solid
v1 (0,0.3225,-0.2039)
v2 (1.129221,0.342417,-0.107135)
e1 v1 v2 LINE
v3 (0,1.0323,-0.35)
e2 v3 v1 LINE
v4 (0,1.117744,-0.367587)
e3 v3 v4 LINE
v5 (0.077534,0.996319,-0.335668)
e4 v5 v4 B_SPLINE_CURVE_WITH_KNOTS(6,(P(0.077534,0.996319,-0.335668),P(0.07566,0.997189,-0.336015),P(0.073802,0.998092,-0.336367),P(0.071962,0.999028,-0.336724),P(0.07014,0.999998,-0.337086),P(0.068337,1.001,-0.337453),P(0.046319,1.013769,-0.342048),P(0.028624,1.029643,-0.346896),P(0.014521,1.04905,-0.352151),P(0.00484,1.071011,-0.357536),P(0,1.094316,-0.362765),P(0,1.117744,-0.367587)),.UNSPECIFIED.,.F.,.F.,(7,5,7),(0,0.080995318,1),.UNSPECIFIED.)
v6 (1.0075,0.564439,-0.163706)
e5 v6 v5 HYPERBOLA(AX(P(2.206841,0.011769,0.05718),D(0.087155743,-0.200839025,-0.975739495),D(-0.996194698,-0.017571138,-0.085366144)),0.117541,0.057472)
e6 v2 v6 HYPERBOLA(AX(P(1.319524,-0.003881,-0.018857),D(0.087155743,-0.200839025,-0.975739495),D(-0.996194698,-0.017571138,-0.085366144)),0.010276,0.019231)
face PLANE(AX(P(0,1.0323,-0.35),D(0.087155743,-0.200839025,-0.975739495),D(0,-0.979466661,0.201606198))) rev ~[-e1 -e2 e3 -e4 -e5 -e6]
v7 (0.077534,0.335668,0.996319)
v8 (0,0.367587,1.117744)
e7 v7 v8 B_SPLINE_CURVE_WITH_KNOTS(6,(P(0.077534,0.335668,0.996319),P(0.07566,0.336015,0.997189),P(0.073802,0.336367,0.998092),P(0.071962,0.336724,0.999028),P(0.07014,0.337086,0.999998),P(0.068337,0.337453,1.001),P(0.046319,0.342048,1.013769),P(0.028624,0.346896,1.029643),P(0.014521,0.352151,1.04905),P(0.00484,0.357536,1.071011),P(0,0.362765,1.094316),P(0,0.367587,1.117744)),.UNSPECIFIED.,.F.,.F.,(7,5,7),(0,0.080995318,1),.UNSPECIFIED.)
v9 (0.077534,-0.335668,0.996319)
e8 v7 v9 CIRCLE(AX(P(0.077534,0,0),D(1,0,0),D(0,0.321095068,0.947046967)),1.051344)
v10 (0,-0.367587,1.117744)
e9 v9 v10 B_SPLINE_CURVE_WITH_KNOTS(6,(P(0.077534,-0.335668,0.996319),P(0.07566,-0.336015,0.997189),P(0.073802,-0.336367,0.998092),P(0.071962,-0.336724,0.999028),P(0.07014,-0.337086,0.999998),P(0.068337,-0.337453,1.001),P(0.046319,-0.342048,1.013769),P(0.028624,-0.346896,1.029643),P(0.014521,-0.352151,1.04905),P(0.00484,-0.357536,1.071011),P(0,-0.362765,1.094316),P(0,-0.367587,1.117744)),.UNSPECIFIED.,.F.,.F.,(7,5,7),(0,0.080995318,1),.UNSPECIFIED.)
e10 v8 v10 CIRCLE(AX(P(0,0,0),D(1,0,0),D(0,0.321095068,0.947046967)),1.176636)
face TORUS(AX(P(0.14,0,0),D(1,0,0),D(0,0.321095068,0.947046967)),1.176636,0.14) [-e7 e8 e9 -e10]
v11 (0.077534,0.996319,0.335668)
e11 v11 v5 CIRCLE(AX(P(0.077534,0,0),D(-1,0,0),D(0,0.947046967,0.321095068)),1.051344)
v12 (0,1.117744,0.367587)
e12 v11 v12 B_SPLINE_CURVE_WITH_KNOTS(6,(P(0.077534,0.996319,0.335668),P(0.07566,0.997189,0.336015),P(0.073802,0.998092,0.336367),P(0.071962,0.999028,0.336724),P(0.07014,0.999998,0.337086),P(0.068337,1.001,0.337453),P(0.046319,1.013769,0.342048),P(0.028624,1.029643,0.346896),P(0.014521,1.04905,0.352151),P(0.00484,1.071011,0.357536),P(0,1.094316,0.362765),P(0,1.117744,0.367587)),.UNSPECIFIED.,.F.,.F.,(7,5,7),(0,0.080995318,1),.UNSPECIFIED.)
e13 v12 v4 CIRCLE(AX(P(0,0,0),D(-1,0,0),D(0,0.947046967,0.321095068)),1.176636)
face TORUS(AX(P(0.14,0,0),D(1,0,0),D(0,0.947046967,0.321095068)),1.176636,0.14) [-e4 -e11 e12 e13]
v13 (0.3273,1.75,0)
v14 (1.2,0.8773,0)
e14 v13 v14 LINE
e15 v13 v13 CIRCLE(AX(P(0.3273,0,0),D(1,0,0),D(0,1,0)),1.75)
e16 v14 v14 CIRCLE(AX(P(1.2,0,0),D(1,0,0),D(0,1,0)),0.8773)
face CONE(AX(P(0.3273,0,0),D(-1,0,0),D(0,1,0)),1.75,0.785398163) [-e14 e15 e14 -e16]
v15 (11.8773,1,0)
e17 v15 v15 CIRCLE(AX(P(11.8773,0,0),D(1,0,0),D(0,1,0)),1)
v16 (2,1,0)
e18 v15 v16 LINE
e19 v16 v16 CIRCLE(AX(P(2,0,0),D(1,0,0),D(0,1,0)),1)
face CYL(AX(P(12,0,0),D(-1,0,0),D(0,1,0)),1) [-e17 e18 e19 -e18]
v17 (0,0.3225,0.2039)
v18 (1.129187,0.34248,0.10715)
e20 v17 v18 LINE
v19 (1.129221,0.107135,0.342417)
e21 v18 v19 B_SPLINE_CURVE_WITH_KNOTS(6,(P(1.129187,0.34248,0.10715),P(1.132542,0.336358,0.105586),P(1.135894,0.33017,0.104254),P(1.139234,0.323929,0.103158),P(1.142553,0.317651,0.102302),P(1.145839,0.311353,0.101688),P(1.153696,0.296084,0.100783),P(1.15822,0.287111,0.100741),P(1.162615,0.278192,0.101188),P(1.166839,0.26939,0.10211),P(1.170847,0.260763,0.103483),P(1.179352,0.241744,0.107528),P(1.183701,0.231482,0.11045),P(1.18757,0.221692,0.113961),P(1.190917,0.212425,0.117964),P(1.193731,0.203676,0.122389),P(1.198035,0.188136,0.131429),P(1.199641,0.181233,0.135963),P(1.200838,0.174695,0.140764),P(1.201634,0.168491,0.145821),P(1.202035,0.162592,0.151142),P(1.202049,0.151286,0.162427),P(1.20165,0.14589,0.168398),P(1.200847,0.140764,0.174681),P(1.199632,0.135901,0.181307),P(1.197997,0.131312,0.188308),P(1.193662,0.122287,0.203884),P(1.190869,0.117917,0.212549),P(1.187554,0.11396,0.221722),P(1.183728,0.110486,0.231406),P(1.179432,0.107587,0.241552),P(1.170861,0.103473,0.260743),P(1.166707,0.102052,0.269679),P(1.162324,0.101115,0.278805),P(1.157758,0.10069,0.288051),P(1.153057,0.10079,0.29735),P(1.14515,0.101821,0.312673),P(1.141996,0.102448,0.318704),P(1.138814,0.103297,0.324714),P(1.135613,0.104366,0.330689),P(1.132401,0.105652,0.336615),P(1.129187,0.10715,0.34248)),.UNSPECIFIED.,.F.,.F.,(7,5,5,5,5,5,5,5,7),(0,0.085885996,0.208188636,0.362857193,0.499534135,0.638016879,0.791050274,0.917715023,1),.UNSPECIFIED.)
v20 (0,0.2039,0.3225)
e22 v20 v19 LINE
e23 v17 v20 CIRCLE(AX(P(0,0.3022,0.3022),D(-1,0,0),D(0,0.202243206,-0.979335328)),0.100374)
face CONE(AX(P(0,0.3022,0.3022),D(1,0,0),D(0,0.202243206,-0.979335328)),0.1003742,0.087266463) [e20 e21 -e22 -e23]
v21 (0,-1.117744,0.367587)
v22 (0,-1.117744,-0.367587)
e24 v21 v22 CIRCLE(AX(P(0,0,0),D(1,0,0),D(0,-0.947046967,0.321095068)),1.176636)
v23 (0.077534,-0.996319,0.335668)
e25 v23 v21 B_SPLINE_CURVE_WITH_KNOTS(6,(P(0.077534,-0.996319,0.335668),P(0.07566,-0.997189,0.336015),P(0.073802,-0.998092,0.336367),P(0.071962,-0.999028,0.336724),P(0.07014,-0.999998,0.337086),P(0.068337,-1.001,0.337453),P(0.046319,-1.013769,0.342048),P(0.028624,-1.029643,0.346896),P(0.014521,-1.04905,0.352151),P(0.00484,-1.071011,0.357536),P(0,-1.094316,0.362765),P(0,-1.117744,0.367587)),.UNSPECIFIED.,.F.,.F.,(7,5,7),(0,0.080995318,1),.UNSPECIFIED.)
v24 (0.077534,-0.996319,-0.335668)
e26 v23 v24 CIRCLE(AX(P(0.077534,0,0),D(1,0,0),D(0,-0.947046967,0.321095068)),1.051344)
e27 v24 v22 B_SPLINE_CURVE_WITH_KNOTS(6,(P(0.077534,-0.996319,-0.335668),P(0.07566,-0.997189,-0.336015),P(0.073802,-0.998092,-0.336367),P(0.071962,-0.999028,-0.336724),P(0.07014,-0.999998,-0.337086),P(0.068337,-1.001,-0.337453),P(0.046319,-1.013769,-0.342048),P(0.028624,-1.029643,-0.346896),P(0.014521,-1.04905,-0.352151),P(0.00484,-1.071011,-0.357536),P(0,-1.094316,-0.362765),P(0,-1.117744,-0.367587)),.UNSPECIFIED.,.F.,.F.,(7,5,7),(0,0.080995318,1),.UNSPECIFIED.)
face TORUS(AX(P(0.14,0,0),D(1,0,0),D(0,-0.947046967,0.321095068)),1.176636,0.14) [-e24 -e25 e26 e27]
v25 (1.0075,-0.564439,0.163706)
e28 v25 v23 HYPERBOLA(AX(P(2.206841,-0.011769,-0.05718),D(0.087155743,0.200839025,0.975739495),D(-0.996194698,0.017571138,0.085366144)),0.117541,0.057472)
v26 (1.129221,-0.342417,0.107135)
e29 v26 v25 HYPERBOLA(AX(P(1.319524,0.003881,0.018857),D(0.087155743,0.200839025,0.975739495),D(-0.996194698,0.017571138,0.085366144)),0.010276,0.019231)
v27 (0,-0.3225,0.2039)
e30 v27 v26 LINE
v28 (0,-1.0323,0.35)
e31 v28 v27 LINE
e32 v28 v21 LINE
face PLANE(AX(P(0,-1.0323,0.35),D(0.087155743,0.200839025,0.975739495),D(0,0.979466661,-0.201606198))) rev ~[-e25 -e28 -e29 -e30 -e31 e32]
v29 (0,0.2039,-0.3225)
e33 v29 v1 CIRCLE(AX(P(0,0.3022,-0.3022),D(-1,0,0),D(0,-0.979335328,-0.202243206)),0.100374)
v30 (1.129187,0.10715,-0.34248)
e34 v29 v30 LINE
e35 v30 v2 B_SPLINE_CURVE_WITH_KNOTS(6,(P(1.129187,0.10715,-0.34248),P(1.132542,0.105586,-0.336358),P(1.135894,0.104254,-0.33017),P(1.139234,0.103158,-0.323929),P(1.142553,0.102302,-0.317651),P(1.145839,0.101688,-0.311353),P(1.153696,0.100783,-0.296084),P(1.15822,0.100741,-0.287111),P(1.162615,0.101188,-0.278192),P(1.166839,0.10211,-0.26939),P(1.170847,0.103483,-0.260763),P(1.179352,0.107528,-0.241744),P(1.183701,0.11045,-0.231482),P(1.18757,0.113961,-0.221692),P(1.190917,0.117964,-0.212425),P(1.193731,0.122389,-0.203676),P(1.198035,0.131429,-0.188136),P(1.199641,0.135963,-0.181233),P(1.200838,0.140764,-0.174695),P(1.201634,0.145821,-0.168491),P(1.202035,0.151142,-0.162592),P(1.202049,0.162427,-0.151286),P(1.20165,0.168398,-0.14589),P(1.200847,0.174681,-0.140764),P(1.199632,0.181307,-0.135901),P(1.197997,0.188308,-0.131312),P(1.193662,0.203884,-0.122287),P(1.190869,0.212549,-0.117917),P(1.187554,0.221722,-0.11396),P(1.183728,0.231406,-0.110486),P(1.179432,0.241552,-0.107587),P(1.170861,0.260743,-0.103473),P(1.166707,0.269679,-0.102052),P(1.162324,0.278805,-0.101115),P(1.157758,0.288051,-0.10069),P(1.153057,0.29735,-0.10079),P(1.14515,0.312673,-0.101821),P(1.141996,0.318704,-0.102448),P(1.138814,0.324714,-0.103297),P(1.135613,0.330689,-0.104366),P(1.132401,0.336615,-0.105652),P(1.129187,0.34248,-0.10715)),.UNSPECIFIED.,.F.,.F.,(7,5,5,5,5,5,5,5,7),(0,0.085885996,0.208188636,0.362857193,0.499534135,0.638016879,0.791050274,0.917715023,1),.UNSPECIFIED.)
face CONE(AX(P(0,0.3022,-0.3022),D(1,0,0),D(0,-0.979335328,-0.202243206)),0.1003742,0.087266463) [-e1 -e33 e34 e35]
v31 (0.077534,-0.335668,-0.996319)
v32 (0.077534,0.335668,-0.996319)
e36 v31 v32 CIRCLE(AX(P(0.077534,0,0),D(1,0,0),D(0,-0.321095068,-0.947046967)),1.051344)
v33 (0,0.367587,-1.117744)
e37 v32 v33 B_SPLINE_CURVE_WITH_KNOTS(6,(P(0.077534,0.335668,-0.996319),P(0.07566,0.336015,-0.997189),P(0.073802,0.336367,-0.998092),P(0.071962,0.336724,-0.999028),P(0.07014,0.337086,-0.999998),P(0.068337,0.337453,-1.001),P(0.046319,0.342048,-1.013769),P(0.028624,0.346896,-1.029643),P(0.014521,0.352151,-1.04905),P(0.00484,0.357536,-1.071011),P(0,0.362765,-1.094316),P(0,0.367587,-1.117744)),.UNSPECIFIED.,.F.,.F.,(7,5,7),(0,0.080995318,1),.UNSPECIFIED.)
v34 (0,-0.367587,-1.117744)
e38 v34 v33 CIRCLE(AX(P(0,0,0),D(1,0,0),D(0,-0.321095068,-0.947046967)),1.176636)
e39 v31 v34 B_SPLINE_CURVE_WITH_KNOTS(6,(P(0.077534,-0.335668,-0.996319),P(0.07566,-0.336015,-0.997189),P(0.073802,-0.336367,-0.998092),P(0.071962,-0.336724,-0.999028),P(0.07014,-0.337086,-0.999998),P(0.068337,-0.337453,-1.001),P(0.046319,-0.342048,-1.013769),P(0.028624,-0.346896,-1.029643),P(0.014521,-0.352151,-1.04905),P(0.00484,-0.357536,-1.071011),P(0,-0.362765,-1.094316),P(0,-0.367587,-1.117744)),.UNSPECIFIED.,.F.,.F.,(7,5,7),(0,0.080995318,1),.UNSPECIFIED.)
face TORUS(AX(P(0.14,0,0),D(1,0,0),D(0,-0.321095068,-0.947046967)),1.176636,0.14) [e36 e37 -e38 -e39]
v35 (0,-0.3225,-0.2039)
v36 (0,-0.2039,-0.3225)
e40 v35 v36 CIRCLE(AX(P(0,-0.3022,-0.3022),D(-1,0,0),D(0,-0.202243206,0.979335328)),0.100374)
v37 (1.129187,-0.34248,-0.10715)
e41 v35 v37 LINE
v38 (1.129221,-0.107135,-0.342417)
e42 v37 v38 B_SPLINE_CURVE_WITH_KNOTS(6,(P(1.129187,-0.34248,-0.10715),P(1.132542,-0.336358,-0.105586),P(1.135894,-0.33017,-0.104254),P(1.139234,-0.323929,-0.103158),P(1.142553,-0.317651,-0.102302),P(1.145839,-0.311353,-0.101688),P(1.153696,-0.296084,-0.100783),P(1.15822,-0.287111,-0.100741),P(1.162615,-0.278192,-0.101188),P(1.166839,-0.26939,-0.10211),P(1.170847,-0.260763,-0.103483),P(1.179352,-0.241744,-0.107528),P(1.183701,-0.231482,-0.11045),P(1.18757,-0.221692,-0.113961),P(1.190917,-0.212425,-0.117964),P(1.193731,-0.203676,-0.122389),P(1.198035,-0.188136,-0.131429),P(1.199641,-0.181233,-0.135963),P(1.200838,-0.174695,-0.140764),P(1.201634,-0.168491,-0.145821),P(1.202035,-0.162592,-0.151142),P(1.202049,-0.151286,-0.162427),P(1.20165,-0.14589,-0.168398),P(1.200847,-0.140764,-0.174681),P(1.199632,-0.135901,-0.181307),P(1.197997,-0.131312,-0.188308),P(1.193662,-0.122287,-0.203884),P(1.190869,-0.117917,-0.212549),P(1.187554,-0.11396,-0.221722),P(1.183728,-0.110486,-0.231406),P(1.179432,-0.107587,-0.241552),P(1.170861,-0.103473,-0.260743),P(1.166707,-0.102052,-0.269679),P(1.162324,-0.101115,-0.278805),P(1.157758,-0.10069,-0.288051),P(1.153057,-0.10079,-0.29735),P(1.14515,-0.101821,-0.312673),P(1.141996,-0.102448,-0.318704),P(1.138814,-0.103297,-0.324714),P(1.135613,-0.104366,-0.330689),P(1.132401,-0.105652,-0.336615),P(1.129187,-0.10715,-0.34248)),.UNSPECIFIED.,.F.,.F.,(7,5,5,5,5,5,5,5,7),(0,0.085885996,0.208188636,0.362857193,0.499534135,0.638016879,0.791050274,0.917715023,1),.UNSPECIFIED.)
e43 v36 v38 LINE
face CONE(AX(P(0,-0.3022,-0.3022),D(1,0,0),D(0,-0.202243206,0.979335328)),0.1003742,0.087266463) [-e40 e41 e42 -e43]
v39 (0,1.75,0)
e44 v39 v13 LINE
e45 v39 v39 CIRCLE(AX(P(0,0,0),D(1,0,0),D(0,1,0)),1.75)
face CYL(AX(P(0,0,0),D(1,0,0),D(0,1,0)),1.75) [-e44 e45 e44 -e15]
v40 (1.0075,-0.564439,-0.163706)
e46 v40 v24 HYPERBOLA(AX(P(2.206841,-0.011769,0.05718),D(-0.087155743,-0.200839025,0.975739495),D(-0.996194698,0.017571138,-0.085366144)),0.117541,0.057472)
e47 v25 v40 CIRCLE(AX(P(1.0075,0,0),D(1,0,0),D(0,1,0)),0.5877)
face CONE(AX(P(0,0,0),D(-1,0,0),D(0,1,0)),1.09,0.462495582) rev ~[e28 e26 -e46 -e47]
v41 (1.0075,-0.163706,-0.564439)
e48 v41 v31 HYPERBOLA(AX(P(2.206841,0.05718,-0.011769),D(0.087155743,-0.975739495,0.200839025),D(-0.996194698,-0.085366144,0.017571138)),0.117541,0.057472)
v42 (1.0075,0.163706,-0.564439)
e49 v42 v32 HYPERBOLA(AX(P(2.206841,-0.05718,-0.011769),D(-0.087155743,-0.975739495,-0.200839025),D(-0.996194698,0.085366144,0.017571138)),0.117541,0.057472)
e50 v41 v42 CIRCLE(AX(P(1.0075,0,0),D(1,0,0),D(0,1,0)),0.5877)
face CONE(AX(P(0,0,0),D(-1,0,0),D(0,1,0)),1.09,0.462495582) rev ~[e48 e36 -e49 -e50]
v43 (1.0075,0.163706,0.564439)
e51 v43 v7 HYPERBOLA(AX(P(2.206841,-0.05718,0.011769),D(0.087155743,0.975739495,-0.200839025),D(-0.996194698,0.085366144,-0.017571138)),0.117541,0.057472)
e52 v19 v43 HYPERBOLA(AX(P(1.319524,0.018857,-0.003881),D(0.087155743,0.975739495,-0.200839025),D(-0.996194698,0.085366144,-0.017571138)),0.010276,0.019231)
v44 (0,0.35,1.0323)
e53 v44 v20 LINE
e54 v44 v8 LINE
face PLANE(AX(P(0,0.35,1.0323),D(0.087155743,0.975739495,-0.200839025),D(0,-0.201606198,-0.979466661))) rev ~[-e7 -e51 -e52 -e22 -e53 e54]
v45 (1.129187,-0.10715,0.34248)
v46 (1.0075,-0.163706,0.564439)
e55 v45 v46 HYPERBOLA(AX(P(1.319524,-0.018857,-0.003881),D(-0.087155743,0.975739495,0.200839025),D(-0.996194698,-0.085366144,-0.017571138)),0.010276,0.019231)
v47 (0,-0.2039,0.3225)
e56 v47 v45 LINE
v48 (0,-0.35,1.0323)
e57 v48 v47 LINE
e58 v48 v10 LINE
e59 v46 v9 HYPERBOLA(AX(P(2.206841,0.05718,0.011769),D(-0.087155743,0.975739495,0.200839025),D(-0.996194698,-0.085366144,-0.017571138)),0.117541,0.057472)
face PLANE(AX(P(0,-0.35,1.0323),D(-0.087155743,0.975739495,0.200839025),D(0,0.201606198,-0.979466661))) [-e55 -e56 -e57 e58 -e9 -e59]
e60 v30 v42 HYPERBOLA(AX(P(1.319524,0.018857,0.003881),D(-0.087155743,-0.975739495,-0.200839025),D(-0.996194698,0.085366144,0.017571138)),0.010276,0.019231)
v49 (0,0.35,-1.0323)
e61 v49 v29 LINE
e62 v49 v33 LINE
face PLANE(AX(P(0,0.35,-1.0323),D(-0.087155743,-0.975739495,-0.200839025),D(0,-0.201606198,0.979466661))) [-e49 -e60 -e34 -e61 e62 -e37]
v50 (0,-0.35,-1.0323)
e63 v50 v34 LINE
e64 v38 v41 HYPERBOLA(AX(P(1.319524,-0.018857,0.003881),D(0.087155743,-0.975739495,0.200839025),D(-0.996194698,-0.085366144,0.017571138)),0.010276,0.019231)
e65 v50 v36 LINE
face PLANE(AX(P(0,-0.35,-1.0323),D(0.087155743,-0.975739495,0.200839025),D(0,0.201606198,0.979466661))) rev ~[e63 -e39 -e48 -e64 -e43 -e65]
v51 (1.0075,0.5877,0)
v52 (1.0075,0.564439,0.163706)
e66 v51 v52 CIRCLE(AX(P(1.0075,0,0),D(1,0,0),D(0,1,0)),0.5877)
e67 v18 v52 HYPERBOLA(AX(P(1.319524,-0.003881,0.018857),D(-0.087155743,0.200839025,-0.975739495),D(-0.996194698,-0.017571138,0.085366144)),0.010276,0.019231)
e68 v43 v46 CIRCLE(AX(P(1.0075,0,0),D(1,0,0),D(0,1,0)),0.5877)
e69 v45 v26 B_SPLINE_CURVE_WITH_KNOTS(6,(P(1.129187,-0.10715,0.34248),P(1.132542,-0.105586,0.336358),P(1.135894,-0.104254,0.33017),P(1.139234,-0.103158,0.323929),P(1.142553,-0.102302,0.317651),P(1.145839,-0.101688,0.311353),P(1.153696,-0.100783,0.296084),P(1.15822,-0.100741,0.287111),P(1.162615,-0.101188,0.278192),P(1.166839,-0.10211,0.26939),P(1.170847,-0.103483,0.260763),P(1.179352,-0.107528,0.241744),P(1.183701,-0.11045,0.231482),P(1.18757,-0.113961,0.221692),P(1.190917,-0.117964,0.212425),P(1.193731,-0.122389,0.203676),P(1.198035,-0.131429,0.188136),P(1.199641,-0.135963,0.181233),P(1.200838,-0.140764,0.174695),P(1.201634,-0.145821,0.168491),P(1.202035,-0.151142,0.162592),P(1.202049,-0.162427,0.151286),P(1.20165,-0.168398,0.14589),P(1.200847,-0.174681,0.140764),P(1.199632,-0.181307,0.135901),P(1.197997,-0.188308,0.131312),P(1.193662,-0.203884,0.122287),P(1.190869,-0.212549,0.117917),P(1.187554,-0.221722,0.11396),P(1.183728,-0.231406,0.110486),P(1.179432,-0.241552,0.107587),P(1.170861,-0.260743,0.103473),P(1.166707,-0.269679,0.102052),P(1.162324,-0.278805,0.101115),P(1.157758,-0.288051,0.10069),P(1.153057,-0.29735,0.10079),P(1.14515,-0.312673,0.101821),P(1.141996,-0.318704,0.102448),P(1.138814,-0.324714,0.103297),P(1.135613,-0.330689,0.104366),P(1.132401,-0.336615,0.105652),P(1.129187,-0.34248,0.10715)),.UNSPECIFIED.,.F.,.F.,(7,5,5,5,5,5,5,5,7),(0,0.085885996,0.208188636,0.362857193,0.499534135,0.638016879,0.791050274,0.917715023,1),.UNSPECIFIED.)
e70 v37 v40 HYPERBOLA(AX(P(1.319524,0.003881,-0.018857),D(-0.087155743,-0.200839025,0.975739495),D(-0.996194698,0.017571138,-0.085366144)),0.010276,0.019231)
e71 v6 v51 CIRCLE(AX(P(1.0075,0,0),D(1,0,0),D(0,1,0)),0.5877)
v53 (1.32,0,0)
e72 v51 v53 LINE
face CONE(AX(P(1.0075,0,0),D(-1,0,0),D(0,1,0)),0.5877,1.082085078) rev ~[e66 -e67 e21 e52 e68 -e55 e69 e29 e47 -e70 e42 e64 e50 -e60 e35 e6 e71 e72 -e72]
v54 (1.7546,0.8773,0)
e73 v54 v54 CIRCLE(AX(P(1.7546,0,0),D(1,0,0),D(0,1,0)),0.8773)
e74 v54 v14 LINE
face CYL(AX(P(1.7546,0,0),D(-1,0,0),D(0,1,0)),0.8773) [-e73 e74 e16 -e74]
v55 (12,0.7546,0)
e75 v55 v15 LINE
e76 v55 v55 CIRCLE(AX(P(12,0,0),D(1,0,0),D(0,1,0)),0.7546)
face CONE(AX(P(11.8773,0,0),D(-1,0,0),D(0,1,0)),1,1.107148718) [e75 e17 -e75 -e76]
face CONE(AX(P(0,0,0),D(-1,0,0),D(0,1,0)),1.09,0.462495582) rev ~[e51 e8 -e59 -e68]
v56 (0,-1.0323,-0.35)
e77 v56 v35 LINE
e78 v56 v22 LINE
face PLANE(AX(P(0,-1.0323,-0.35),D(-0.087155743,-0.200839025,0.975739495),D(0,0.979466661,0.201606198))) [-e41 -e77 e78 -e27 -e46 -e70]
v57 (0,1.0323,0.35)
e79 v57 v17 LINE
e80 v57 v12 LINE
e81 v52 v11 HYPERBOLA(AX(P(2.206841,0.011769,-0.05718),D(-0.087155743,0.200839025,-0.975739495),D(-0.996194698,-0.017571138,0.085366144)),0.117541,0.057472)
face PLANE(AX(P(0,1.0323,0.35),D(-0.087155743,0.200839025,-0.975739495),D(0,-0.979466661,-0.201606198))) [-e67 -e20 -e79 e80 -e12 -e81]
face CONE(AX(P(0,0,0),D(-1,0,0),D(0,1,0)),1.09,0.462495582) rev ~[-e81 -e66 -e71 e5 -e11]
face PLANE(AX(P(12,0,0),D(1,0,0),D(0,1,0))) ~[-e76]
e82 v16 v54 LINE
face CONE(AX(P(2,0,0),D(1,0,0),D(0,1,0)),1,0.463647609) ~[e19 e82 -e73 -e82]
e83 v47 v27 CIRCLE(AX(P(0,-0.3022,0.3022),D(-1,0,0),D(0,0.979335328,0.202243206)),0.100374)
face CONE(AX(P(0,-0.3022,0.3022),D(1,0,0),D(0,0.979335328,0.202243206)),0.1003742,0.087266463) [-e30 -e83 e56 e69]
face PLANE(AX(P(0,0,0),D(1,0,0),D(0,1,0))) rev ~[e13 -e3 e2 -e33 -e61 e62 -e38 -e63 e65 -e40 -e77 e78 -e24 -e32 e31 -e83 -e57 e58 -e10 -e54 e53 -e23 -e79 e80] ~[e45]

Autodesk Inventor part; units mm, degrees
ref_plane "YZ Plane" through (0, 0, 0) normal (1, 0, 0) x (0, 1, 0)
ref_plane "XZ Plane" through (0, 0, 0) normal (0, 1, 0) x (-1, 0, 0)
sketch "Sketch1" plane through (0, 0, 0) normal (0, 0, 1) x (1, 0, 0)
  line L0 (1.32, 0) -> (12, 0)
  line L1 (12, 0) -> (12, 1)
  line L2 (12, 1) -> (2, 1)
  line L3 (2, 1) -> (1.7546, 0.8773)
  line L4 (1.7546, 0.8773) -> (1.2, 0.8773)
  line L5 (0, 1.75) -> (0, 1.09)
  line L6 (0, 1.09) -> (1.0075, 0.5877)
  line L7 (1.0075, 0.5877) -> (1.32, 0)
  line L8 (-2.4, 0) -> (14.4, 0) projected
  line L9 (0, -0.35) -> (0, 2.1) projected
  line L10 (0, 1.75) -> (0.3273, 1.75)
  line L11 (0.3273, 1.75) -> (1.2, 0.8773)
  line L12 (2, 1) -> (1.0773, 1) construction
  dimension "d1" = 10
  dimension "d2" = 2
  dimension "d3" = 1.7546
  dimension "d4" = 2.18
  dimension "d5" = 26.5
  dimension "d6" = 62
  dimension "d7" = 1.32
  dimension "d8" = 0.2454
  dimension "d12" = 3.5
  dimension "d13" = 45
  dimension "d15" = 12
  dimension "d24" = 1.2
revolve "Body" add sketch "Sketch1" angle 360 about axis through (1.32, 0, 0) along (1, 0, 0) contours L7 L6 L5 L10 L11 L4 L3 L2 L1 L0
sketch "Sketch2" plane through (0, 0, 0) normal (-1, 0, 0) x (0, 0, 1)
  line L0 (0, 1.09) -> (0, 0) construction
  line L1 (0, 0) -> (1.09, 0) construction
  arc A0 (0.327, 0) -> (0, 0.327) centre (0, 0) ccw construction
  arc A1 (0.3815, 0) -> (0, 0.3815) centre (0, 0) ccw construction
  arc A2 (1.0323, 0.35) -> (0.35, 1.0323) centre (0, 0) ccw
  line L2 (0, 0) -> (0.7707, 0.7707) construction
  line L3 (0.35, 1.0323) -> (0.2039, 0.3225)
  line L4 (1.0323, 0.35) -> (0.3225, 0.2039)
  arc A3 (0.35, 1.0323) -> (0, 1.09) centre (0, 0) ccw
  arc A4 (1.09, 0) -> (1.0323, 0.35) centre (0, 0) ccw
  line L5 (0, -2.45) -> (0, 2.45) projected
  line L6 (-2.45, 0) -> (2.45, 0) projected
  arc A5 (0.35, -1.0323) -> (1.0323, -0.35) centre (0, 0) ccw
  line L7 (0.35, -1.0323) -> (0.2039, -0.3225)
  line L8 (1.0323, -0.35) -> (0.3225, -0.2039)
  arc A6 (0, -1.09) -> (0.35, -1.0323) centre (0, 0) ccw
  arc A7 (1.0323, -0.35) -> (1.09, 0) centre (0, 0) ccw
  arc A8 (-0.35, 1.0323) -> (-1.0323, 0.35) centre (0, 0) ccw
  line L9 (-0.35, 1.0323) -> (-0.2039, 0.3225)
  line L10 (-1.0323, 0.35) -> (-0.3225, 0.2039)
  arc A9 (0, 1.09) -> (-0.35, 1.0323) centre (0, 0) ccw
  arc A10 (-1.0323, 0.35) -> (-1.09, 0) centre (0, 0) ccw
  arc A11 (-0.35, -1.0323) -> (0, -1.09) centre (0, 0) ccw
  arc A12 (-1.0323, -0.35) -> (-0.35, -1.0323) centre (0, 0) ccw
  arc A13 (-1.09, 0) -> (-1.0323, -0.35) centre (0, 0) ccw
  line L11 (-1.0323, -0.35) -> (-0.3225, -0.2039)
  line L12 (-0.35, -1.0323) -> (-0.2039, -0.3225)
  arc A14 (0.2039, 0.3225) -> (0.3225, 0.2039) centre (0.3022, 0.3022) ccw
  arc A15 (0.3225, -0.2039) -> (0.2039, -0.3225) centre (0.3022, -0.3022) ccw
  arc A16 (-0.3225, 0.2039) -> (-0.2039, 0.3225) centre (-0.3022, 0.3022) ccw
  arc A17 (-0.2039, -0.3225) -> (-0.3225, -0.2039) centre (-0.3022, -0.3022) ccw
  point P0 (0.7707, -0.7707)
  point P1 (-0.7707, 0.7707)
  point P2 (-0.7707, -0.7707)
  dimension "d17" = 0.654
  dimension "d18" = 0.763
  dimension "d19" = 2.18
  dimension "d20" = 45
  dimension "d21" = 0.35
extrude "Slot" add sketch "Sketch2" against normal up to next draft 5 contours L4 A14 L3 A2 | A5 L7 A15 L8 | L9 A16 L10 A8 | A12 L11 A17 L12
fillet "Fillet1" radius 0.14 4 edges at (0, 1.09, 0) (0, 0, -1.09) (0, -1.09, 0) (0, 0, 1.09)
thread "Thread" size "M2x0.4" class "6g" standard "ISO Metric profile" length 10
chamfer "Chamfer1" distance 0.2454 distance2 0.1227 1 edges at (12, -1, 0) measured on face at (12, 0.1182, 0.3117)
ref_plane "Work Plane2" through (3.35, 0, 0) normal (0, 0, -1) x (1, 0, 0)
equation "\"d17\" = 0.3 * SDM"
equation "\"d18\" = 0.35 * SDM"
equation "\"d19\" = SDM"
equation "\"d21\" = 0.5 * SBR"
equation "\"d1\" = GEL"
equation "\"d2\" = GD"
equation "\"d3\" = BDM"
equation "\"d4\" = SDM"
equation "\"d7\" = INTI"
equation "\"d8\" = GAL"
equation "\"d12\" = KOD"
equation "\"d13\" = 0.5 * SEWI"
equation "\"d15\" = NLG"
equation "\"d24\" = KOH"
equation "\"d23\" = 0.2 * SBR"
equation "\"d10\" = GEL"
equation "\"d25\" = -0.5 * SPD + 0.5 * GD"
equation "\"d26\" = 0.5 * GAL"
equation "\"NLG\" = 12"
equation "\"GEL\" = 10"
equation "\"GAL\" = 0.61345 * PTC"
equation "\"SPD\" = NND - 1.2269 * PTC"
equation "\"KOD\" = 3.5"
equation "\"KOH\" = 1.2"
equation "\"SBR\" = 0.7"
equation "\"INTI\" = 1.32"
equation "\"SDM\" = 2.18"
equation "\"GD\" = NND"
equation "\"BDM\" = NND - GAL"
equation "\"SEWI\" = 90deg"
equation "\"d9\" = SDM"
equation "\"GUL\" = 0.61345 * PTC"
equation "\"TOA\" = 30deg"
equation "\"EPV\" = 2.2"
equation "\"THREADDIA\" = 2"
equation "\"RR\" = 0.2"
equation "\"PTC\" = 0.4"
equation "\"NND\" = 2"
equation "\"GD1\" = THREADDIA - 1.2269 * PTC"
properties part number "AS 1427 - M2 x 12" material "Steel, Mild"
